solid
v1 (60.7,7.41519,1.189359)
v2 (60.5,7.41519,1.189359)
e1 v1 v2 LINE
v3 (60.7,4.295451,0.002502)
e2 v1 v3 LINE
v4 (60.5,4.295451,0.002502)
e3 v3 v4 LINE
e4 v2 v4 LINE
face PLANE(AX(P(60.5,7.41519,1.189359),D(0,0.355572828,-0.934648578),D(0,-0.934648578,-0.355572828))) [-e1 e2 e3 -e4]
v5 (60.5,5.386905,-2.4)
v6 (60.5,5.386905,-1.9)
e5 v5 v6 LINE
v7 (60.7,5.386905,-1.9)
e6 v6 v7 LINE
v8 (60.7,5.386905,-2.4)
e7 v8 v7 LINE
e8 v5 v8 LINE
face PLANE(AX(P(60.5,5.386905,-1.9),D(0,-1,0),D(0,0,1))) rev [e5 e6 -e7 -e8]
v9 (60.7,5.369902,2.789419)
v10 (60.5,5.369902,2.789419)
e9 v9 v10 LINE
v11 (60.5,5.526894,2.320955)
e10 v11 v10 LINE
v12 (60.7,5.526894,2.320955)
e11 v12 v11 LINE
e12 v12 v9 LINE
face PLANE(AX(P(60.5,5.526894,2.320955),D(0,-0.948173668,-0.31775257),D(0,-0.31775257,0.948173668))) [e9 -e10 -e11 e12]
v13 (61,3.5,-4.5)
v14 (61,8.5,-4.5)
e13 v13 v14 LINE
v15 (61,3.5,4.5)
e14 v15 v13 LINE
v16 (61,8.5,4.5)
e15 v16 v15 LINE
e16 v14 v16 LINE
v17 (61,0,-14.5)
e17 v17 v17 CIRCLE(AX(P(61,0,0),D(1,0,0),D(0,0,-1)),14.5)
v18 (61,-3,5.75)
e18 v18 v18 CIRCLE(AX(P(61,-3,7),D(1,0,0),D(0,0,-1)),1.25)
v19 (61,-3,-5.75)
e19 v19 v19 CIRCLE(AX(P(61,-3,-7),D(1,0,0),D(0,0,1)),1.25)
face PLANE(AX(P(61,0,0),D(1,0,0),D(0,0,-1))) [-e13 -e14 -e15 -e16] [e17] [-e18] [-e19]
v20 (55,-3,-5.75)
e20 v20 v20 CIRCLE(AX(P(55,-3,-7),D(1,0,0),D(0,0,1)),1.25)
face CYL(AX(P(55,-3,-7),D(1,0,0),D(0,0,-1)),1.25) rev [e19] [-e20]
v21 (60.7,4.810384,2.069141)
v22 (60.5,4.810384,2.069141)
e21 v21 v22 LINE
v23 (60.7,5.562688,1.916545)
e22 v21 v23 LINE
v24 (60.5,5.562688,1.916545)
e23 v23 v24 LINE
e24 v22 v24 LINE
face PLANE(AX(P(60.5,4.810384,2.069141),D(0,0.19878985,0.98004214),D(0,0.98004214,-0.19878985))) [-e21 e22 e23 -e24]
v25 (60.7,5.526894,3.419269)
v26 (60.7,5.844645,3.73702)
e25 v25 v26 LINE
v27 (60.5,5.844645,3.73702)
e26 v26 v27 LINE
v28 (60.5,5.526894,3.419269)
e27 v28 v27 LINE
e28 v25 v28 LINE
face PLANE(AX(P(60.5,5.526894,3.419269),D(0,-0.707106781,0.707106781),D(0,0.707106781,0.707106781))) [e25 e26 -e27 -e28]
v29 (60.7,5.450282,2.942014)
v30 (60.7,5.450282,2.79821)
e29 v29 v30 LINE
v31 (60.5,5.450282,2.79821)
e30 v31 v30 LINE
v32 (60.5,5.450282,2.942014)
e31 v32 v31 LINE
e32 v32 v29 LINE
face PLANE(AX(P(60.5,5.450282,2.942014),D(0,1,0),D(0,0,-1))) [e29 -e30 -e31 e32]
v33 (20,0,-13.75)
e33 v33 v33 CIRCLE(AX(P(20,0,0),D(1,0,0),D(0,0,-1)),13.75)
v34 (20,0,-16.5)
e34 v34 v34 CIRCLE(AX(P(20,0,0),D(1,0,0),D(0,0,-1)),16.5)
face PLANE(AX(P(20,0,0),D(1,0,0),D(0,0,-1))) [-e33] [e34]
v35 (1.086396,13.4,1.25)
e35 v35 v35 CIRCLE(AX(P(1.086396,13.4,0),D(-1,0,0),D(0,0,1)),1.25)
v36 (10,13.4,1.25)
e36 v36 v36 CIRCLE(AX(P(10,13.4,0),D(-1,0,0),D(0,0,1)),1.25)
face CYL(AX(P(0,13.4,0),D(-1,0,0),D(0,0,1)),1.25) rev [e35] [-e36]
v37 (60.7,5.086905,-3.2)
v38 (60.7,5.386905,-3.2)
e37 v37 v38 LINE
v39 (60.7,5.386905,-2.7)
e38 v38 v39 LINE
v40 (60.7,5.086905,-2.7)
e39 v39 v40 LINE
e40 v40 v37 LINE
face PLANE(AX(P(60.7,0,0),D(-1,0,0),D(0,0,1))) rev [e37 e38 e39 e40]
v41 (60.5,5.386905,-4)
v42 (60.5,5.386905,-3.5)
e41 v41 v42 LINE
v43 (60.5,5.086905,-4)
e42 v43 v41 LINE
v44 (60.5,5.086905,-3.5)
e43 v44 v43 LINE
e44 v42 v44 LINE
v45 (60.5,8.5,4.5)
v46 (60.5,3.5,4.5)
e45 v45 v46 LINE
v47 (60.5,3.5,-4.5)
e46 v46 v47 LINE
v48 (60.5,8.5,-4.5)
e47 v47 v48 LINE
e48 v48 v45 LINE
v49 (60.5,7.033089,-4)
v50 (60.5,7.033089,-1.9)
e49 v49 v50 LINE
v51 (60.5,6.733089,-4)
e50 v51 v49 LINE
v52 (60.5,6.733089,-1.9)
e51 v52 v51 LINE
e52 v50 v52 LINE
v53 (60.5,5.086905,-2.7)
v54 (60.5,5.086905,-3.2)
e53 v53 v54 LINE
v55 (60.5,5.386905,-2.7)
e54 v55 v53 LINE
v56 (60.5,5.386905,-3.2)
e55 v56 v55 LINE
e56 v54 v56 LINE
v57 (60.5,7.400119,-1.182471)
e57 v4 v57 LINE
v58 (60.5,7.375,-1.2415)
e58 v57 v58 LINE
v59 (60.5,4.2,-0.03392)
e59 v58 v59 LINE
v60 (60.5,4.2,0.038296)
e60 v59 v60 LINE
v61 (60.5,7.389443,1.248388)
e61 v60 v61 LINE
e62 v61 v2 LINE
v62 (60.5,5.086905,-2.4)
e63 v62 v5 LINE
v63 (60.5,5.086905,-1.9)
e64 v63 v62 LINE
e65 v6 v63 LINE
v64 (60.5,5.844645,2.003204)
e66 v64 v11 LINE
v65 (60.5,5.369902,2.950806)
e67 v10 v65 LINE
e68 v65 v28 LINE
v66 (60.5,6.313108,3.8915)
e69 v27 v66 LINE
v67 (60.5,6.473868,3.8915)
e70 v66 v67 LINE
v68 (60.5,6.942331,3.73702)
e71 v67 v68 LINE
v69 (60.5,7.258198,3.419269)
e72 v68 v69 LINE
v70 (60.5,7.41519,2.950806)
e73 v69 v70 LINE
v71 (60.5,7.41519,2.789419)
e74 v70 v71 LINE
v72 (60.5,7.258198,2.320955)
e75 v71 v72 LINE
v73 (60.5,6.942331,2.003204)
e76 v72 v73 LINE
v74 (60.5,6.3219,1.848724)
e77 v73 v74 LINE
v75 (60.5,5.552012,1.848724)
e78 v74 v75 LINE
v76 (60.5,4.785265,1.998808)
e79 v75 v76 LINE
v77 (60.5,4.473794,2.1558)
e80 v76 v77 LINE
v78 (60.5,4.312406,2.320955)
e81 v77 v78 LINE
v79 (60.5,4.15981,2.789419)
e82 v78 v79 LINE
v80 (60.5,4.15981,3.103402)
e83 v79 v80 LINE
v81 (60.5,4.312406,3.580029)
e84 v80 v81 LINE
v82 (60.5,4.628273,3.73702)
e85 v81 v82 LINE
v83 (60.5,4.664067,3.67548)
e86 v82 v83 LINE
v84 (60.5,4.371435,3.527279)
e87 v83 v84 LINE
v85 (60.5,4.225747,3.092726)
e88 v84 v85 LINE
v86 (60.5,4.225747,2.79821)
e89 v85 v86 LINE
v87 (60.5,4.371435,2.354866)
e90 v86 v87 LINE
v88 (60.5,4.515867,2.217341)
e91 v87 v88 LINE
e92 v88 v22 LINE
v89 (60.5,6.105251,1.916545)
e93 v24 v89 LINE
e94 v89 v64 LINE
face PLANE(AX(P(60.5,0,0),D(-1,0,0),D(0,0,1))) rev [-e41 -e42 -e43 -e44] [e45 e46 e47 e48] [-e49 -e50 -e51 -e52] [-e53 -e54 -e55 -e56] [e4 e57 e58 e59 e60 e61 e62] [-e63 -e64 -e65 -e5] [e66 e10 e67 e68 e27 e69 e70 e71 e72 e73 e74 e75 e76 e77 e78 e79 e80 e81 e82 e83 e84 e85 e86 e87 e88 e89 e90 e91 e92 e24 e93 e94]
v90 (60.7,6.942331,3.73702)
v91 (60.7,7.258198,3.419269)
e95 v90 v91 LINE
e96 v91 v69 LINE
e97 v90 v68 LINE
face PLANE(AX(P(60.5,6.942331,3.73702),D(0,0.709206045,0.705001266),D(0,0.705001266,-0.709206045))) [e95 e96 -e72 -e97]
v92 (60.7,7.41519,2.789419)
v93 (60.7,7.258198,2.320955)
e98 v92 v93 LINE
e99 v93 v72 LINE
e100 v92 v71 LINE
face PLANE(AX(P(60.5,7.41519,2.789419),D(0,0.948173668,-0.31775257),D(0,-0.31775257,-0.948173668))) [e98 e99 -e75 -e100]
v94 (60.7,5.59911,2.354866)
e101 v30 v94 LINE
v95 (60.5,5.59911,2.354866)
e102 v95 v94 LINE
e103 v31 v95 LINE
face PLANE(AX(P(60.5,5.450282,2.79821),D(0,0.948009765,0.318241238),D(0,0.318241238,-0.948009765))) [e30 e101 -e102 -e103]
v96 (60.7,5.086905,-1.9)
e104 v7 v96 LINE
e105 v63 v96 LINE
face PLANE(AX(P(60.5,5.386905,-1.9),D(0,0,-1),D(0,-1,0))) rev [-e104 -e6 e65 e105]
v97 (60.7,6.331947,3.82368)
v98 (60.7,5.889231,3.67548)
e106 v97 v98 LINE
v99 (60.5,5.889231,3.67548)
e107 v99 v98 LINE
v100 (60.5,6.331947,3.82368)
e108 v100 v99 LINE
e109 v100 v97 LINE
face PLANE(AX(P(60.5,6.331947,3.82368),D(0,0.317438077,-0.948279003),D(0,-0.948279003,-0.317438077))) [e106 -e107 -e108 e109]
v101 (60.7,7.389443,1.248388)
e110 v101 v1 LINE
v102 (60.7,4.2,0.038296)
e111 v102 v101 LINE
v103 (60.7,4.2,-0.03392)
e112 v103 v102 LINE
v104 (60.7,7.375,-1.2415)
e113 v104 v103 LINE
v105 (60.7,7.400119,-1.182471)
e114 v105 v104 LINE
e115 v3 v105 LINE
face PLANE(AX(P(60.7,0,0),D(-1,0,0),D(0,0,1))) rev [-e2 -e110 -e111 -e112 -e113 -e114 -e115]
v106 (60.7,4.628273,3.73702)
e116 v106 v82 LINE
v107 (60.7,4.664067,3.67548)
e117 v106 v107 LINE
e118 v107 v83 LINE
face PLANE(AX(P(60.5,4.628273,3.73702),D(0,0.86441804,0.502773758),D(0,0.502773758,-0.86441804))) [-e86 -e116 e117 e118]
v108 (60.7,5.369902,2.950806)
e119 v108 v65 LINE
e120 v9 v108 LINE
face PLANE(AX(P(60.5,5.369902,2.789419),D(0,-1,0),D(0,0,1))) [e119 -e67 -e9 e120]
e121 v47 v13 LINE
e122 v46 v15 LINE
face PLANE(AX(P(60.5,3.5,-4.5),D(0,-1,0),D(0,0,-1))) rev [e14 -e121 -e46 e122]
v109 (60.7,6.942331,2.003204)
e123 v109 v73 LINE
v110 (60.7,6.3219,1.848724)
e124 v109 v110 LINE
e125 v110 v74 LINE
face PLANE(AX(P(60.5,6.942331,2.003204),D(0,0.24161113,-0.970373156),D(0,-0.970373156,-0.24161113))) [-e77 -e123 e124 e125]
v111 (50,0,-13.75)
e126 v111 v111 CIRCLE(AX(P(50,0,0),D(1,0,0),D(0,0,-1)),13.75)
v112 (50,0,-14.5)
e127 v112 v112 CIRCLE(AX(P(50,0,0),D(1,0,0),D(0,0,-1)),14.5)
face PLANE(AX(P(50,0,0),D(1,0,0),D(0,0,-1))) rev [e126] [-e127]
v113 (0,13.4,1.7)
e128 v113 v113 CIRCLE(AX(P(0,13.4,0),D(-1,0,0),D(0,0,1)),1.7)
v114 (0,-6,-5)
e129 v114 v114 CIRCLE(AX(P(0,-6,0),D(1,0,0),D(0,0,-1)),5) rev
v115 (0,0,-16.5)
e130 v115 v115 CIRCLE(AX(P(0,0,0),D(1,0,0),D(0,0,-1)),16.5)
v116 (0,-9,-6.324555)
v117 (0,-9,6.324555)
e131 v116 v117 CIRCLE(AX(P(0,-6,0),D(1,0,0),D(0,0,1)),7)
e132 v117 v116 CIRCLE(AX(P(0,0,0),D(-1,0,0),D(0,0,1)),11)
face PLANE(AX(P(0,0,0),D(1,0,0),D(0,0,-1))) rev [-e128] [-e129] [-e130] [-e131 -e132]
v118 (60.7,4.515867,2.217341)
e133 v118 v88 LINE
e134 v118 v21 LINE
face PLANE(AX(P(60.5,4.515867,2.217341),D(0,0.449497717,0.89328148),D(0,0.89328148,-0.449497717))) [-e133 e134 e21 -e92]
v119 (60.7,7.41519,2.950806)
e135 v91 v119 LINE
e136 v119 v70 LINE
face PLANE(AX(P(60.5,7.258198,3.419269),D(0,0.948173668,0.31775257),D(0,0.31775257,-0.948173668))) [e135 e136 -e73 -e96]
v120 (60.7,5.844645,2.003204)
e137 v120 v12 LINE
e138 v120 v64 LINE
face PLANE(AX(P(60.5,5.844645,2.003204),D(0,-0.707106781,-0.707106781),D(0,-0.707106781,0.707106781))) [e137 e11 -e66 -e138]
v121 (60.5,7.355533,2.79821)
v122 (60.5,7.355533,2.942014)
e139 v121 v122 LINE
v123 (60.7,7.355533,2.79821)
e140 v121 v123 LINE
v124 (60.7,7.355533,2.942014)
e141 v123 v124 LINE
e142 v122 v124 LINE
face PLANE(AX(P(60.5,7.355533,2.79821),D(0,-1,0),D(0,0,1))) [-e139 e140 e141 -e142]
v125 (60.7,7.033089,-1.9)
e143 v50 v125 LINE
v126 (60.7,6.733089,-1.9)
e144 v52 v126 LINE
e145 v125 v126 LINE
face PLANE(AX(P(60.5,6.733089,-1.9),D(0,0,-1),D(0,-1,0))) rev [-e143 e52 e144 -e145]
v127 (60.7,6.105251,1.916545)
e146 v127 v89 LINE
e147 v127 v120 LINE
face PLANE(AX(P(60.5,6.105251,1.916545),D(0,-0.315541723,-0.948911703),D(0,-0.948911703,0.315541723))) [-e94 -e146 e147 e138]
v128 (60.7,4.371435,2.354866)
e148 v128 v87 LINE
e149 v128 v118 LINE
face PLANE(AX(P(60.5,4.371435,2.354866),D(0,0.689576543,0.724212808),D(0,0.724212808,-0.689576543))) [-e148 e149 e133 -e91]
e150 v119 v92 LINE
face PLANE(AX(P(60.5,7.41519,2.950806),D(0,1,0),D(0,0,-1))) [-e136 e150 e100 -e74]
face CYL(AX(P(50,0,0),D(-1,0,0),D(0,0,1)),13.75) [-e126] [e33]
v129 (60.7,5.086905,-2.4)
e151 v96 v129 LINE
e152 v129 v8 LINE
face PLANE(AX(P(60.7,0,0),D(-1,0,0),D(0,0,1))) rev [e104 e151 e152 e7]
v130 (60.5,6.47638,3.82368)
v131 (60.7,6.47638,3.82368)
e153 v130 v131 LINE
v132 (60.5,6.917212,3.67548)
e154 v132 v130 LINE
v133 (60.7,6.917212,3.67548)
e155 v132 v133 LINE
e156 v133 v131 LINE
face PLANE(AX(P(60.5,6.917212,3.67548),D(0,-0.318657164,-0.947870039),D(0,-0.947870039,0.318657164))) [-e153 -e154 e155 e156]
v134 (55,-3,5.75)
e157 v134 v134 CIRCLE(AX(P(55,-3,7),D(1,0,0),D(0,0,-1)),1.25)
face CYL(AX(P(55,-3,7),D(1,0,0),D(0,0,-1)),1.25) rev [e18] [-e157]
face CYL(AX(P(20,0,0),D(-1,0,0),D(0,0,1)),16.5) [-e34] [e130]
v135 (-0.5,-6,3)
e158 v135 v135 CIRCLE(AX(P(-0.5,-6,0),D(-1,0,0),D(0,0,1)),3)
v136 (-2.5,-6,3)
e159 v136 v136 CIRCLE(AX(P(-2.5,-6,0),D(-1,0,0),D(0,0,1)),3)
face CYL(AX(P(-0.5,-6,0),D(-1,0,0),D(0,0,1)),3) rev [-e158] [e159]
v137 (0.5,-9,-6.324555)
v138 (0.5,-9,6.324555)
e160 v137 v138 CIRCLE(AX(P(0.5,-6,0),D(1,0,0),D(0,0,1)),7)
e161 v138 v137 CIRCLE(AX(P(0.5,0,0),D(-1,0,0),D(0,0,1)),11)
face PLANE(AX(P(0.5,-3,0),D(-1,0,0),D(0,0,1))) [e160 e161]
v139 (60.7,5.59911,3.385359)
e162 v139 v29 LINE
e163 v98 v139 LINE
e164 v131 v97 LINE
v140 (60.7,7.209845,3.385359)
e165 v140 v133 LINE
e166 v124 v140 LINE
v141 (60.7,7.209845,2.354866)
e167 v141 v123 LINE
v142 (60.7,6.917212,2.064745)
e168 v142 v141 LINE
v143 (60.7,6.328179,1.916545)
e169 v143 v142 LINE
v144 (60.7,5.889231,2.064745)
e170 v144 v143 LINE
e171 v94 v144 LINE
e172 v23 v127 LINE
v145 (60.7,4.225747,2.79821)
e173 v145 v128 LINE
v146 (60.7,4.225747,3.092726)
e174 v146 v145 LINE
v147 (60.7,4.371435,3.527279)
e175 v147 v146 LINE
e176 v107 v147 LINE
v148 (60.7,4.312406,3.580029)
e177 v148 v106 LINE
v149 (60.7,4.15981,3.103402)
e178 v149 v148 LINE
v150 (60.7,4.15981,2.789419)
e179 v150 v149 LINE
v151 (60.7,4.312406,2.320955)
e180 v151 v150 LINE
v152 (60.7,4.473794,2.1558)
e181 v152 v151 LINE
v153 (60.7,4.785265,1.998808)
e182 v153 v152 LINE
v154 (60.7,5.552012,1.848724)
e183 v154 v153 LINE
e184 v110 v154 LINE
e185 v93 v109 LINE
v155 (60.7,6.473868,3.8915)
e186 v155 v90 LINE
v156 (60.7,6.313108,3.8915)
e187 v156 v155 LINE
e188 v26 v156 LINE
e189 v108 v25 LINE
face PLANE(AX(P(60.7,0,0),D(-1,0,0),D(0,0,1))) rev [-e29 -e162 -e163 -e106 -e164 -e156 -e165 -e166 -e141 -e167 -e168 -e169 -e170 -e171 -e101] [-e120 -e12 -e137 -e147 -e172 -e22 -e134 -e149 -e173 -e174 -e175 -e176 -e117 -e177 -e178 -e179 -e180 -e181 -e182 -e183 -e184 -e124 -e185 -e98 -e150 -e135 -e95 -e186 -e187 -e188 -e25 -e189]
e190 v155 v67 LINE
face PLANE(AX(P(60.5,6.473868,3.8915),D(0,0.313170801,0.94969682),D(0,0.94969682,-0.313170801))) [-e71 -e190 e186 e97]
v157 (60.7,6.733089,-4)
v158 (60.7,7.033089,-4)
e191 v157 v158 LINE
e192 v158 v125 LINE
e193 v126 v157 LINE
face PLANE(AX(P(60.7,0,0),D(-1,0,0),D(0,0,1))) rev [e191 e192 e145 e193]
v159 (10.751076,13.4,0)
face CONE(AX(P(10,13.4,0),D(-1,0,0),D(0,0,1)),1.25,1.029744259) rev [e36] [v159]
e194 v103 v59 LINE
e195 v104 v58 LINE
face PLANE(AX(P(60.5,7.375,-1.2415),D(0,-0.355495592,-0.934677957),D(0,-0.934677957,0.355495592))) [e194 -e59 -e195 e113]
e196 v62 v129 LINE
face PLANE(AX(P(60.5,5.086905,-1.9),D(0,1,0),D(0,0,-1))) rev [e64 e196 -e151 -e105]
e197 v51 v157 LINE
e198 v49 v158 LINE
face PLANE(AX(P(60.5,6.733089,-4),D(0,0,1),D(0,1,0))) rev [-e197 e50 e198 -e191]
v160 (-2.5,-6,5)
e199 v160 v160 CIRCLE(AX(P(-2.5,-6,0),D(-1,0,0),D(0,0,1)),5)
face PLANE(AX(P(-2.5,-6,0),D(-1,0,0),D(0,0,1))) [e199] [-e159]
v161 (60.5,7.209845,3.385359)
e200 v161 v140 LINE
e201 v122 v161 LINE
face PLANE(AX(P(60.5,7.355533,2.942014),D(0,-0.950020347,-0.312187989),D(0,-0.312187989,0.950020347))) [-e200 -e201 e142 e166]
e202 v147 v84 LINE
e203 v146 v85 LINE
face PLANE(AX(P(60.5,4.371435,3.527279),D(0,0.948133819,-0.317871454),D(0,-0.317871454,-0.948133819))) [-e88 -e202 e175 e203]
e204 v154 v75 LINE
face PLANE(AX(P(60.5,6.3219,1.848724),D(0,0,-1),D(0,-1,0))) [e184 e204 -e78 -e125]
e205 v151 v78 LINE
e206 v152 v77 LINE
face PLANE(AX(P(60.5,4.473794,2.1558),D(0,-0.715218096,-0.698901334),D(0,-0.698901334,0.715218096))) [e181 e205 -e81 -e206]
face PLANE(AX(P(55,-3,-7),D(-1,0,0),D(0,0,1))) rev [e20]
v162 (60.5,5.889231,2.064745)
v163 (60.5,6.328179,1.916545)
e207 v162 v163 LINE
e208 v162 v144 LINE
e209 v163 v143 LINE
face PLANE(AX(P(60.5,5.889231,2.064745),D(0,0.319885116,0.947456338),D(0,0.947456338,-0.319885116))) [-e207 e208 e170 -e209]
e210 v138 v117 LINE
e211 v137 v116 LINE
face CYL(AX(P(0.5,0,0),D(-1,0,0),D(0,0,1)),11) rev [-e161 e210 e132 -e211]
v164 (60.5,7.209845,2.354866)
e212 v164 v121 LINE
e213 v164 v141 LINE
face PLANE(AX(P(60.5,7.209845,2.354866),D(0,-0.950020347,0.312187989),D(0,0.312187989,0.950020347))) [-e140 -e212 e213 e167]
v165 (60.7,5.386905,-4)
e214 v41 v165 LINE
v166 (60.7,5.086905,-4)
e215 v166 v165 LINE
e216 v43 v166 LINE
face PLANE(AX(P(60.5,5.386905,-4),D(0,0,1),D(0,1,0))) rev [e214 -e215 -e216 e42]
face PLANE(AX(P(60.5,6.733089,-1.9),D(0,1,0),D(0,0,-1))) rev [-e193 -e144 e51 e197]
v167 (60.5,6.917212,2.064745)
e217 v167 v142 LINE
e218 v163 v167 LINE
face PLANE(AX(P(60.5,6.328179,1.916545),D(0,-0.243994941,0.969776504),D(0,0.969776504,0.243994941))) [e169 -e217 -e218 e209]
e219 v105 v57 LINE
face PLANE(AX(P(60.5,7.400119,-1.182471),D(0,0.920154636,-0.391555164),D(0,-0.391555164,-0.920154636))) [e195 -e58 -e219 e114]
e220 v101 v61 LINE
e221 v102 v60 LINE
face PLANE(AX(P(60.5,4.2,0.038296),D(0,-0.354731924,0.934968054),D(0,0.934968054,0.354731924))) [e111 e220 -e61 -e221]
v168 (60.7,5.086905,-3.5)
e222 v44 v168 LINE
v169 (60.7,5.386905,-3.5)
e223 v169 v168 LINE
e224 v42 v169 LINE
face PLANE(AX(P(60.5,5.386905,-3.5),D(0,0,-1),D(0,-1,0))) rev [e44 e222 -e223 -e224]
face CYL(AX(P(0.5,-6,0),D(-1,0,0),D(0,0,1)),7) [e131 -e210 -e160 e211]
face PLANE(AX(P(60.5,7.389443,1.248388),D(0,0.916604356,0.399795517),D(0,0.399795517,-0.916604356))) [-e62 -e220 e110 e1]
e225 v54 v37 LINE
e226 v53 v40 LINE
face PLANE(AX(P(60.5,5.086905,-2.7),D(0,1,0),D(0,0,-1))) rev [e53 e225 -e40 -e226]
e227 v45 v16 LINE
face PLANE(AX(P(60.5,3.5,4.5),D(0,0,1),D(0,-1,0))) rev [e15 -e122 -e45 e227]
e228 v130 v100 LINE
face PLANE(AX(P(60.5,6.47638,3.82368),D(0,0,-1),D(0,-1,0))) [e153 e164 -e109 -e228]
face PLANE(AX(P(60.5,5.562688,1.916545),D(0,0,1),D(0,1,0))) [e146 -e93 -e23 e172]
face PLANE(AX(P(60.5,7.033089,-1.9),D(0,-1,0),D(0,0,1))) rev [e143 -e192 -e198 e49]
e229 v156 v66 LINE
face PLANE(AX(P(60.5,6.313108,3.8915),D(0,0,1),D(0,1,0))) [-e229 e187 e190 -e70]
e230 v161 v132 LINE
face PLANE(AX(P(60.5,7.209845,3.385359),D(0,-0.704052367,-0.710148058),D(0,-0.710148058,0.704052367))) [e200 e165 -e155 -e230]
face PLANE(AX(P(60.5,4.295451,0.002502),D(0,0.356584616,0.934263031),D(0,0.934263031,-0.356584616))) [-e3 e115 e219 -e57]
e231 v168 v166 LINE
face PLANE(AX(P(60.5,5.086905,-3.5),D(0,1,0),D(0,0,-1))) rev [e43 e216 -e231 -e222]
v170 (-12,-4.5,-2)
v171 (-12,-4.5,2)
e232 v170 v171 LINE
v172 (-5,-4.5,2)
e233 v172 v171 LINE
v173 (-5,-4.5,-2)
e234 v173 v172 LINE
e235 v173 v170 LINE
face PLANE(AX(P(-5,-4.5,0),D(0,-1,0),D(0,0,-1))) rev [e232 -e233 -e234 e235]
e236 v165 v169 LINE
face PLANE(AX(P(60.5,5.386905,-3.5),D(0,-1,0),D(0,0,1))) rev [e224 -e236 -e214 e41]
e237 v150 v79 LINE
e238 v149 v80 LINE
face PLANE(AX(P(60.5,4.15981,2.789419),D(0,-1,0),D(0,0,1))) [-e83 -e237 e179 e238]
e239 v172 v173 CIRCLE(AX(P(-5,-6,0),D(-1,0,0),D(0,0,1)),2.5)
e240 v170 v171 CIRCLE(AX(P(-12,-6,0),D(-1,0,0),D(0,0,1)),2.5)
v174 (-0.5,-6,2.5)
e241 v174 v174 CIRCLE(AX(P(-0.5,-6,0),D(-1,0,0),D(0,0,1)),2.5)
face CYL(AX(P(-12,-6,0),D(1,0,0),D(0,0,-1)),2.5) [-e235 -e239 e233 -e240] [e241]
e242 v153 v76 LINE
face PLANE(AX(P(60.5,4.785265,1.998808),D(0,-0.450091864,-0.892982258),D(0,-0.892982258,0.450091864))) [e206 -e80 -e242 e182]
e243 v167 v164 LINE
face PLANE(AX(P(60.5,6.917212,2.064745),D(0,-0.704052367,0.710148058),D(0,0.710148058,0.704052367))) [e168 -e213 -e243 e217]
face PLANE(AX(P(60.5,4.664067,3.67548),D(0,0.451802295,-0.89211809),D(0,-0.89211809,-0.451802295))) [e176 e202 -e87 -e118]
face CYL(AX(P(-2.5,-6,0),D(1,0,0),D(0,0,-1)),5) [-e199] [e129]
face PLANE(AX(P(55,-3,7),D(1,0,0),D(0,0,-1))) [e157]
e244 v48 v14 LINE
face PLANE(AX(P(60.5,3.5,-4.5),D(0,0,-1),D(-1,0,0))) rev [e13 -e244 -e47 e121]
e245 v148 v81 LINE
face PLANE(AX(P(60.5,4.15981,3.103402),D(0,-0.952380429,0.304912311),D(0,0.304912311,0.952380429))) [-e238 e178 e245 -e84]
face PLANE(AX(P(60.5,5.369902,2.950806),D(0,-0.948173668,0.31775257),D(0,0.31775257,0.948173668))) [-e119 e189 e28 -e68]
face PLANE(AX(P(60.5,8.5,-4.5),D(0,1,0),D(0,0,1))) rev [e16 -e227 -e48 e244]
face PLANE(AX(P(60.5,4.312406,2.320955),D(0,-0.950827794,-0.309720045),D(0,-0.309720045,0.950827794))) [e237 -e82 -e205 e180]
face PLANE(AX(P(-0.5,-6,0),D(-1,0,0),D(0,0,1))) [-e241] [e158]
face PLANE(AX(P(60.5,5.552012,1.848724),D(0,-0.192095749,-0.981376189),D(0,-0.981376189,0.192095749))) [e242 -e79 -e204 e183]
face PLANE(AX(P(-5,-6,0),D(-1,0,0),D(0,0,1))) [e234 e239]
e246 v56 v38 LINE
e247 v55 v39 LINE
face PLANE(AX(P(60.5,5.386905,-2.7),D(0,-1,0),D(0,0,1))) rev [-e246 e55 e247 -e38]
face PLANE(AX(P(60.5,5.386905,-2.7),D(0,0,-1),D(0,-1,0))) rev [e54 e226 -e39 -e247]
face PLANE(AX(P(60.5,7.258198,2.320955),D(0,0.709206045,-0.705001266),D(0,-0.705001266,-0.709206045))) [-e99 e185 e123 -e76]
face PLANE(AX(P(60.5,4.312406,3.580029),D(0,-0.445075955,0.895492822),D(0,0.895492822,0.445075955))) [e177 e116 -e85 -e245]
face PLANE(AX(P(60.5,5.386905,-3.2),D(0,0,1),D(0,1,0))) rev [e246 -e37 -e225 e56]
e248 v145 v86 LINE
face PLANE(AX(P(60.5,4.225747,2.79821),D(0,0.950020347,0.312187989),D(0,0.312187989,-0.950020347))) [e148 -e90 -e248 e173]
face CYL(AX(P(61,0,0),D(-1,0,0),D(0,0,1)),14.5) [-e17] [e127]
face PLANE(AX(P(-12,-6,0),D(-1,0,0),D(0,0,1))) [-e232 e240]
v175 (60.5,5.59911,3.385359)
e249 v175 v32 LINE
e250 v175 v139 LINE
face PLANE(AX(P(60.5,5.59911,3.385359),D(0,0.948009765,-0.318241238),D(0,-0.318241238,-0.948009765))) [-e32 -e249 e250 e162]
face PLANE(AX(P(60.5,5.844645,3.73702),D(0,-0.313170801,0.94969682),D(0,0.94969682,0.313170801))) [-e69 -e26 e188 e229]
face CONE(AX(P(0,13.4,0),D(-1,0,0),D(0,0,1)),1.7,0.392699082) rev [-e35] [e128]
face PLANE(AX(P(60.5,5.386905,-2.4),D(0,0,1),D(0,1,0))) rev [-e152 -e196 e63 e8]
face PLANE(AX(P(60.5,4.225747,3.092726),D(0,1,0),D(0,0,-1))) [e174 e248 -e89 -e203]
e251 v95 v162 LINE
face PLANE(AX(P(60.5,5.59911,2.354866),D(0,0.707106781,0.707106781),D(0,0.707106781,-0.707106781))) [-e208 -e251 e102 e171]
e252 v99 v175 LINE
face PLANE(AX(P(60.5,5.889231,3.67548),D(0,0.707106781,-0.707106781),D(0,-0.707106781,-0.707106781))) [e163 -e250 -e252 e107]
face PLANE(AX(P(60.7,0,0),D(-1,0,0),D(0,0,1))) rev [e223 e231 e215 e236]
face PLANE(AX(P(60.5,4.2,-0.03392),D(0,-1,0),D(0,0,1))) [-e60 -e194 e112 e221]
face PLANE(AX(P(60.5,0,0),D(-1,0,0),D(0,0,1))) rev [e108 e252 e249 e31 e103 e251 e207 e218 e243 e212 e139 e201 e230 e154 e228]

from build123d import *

# Parameters (mm, degrees)
SKETCH_1_R                   = 16.5
EXTRUDE_1_DEPTH              = 20
SKETCH_2_R                   = 13.75
EXTRUDE_2_DEPTH              = 30
SKETCH_3_R                   = 14.5
EXTRUDE_3_DEPTH              = 11
SKETCH_4_W                   = 9
SKETCH_4_H                   = 5
CUT_EXTRUDE_1_DEPTH          = 0.5
WRAP_1_OUTLINE_W             = 2.1
WRAP_1_OUTLINE_H             = 0.3
WRAP_1_OUTLINE_W_2           = 0.5
WRAP_1_DEPTH                 = 0.2
SKETCH_6_R                   = 1.25
CUT_EXTRUDE_2_DEPTH          = 6
CUT_EXTRUDE_3_DEPTH          = 0.5
SKETCH_8_R                   = 5
EXTRUDE_4_DEPTH              = 2.5
SKETCH_9_R                   = 3
CUT_EXTRUDE_4_DEPTH          = 2
SKETCH_10_R                  = 2.5
EXTRUDE_5_DEPTH              = 11.5
CUT_EXTRUDE_START            = -7
CUT_EXTRUDE_5_DEPTH          = 7
HOLE_WIZARD_M3_1_D           = 2.5
HOLE_WIZARD_M3_1_DEPTH       = 10
HOLE_WIZARD_M3_1_CSINK_D     = 3.4
HOLE_WIZARD_M3_1_CSINK_ANGLE = 45
HOLE_WIZARD_M3_1_TIP         = 0.751075774


# Read off the part's stored shape, not the designer's step: 包覆1
with BuildPart() as part:
    # 草图1 → 凸台-拉伸1 (new body)
    with BuildSketch(Plane(origin=(0, 0, 0), x_dir=(0, 0, -1), z_dir=(1, 0, 0))):
        Circle(SKETCH_1_R)
    extrude(amount=EXTRUDE_1_DEPTH)

    # 草图2 → 凸台-拉伸2 (add)
    with BuildSketch(Plane(origin=(20, 0, 0), x_dir=(0, 0, -1), z_dir=(1, 0, 0))):
        Circle(SKETCH_2_R)
    extrude(amount=EXTRUDE_2_DEPTH)

    # 草图3 → 凸台-拉伸3 (add)
    with BuildSketch(Plane(origin=(50, 0, 0), x_dir=(0, 0, -1), z_dir=(1, 0, 0))):
        Circle(SKETCH_3_R)
    extrude(amount=EXTRUDE_3_DEPTH)

    # 草图4 → 切除-拉伸1 (cut)
    with BuildSketch(Plane(origin=(61, 0, 0), x_dir=(0, 0, -1), z_dir=(1, 0, 0))):
        with Locations((0, 6)):
            Rectangle(SKETCH_4_W, SKETCH_4_H)
    extrude(amount=-CUT_EXTRUDE_1_DEPTH, mode=Mode.SUBTRACT)

    # 包覆1 outline → 包覆1 (add)
    # profile 1 of 6: a face of its own
    with BuildSketch(Plane(origin=(60.5, 0, 0), x_dir=(0, 0, -1), z_dir=(1, 0, 0))):
        Polygon((-2.789418513, 5.369902097), (-2.320955301, 5.52689379), (-2.003204114, 5.844644976), (-1.916544699, 6.105251187), (-1.916544699, 5.562687896), (-2.069140625, 4.810383703), (-2.217340783, 4.515867286), (-2.354865506, 4.371434929), (-2.798210047, 4.225746638), (-3.092726464, 4.225746638), (-3.52727947, 4.371434929), (-3.675479628, 4.664067445), (-3.737020372, 4.628273339), (-3.580028679, 4.312406052), (-3.103401899, 4.159810127), (-2.789418513, 4.159810127), (-2.320955301, 4.312406052), (-2.15580004, 4.473793513), (-1.998808347, 4.785265032), (-1.848724288, 5.55201246), (-1.848724288, 6.321899723), (-2.003204114, 6.942330894), (-2.320955301, 7.25819818), (-2.789418513, 7.415189873), (-2.950805973, 7.415189873), (-3.419269185, 7.25819818), (-3.737020372, 6.942330894), (-3.891500198, 6.473867682), (-3.891500198, 6.313108188), (-3.737020372, 5.844644976), (-3.419269185, 5.52689379), (-2.950805973, 5.369902097), align=None)
        Polygon((-2.798210047, 7.35553303), (-2.354865506, 7.209844739), (-2.064744858, 6.917212223), (-1.916544699, 6.328179391), (-2.064744858, 5.889230617), (-2.354865506, 5.599109968), (-2.798210047, 5.450281843), (-2.942014438, 5.450281843), (-3.385358979, 5.599109968), (-3.675479628, 5.889230617), (-3.823679786, 6.331947191), (-3.823679786, 6.476379549), (-3.675479628, 6.917212223), (-3.385358979, 7.209844739), (-2.942014438, 7.35553303), align=None, mode=Mode.SUBTRACT)
    # profile 2 of 6: a face of its own
    with BuildSketch(Plane(origin=(60.5, 0, 0), x_dir=(0, 0, -1), z_dir=(1, 0, 0))):
        Polygon((-1.248388054, 7.389443236), (-0.038296084, 4.2), (0.033920095, 4.2), (1.241500198, 7.375), (1.182471321, 7.400118671), (-0.002501978, 4.295450949), (-1.189359177, 7.415189873), align=None)
    # profile 3 of 6: a face of its own
    with BuildSketch(Plane(origin=(60.5, 0, 0), x_dir=(0, 0, -1), z_dir=(1, 0, 0))):
        with Locations((2.95, 6.883089037)):
            Rectangle(WRAP_1_OUTLINE_W, WRAP_1_OUTLINE_H)
    # profile 4 of 6: a face of its own
    with BuildSketch(Plane(origin=(60.5, 0, 0), x_dir=(0, 0, -1), z_dir=(1, 0, 0))):
        with Locations((3.75, 5.236905413)):
            Rectangle(WRAP_1_OUTLINE_W_2, WRAP_1_OUTLINE_H)
    # profile 5 of 6: a face of its own
    with BuildSketch(Plane(origin=(60.5, 0, 0), x_dir=(0, 0, -1), z_dir=(1, 0, 0))):
        with Locations((2.15, 5.236905413)):
            Rectangle(WRAP_1_OUTLINE_W_2, WRAP_1_OUTLINE_H)
    # profile 6 of 6: a face of its own
    with BuildSketch(Plane(origin=(60.5, 0, 0), x_dir=(0, 0, -1), z_dir=(1, 0, 0))):
        with Locations((2.95, 5.236905413)):
            Rectangle(WRAP_1_OUTLINE_W_2, WRAP_1_OUTLINE_H)
    extrude(amount=WRAP_1_DEPTH)

    # 草图6 → 切除-拉伸2 (cut)
    with BuildSketch(Plane(origin=(61, 0, 0), x_dir=(0, 0, -1), z_dir=(1, 0, 0))):
        with Locations((-7, -3)):
            Circle(SKETCH_6_R)
        with Locations(Location((7, -3, 0), (0, 0, 180))):
            Circle(SKETCH_6_R)
    extrude(amount=-CUT_EXTRUDE_2_DEPTH, mode=Mode.SUBTRACT)

    # 草图7 → 切除-拉伸3 (cut)
    with BuildSketch(Plane.ZY):
        with BuildLine():
            ThreePointArc((6.32455532, -9), (0, 11), (-6.32455532, -9))
            ThreePointArc((-6.32455532, -9), (0, 1), (6.32455532, -9))
        make_face()
    extrude(amount=-CUT_EXTRUDE_3_DEPTH, mode=Mode.SUBTRACT)

    # 草图8 → 凸台-拉伸4 (add)
    with BuildSketch(Plane.ZY):
        with Locations(Location((0, -6, 0), (0, 0, 180))):
            Circle(SKETCH_8_R)
    extrude(amount=EXTRUDE_4_DEPTH)

    # 草图9 → 切除-拉伸4 (cut)
    with BuildSketch(Plane.ZY.offset(2.5)):
        with Locations((0, -6)):
            Circle(SKETCH_9_R)
    extrude(amount=-CUT_EXTRUDE_4_DEPTH, mode=Mode.SUBTRACT)

    # 草图10 → 凸台-拉伸5 (add)
    with BuildSketch(Plane.ZY.offset(0.5)):
        with Locations((0, -6)):
            Circle(SKETCH_10_R)
    extrude(amount=EXTRUDE_5_DEPTH)

    # 草图11 → 切除-拉伸5 (cut)
    with BuildSketch(Plane.ZY.offset(12).offset(CUT_EXTRUDE_START)):
        with BuildLine():
            Line((0, -4.5), (-2, -4.5))
            ThreePointArc((-2, -4.5), (0, -3.5), (2, -4.5))
            Line((2, -4.5), (0, -4.5))
        make_face()
    extrude(amount=CUT_EXTRUDE_5_DEPTH, mode=Mode.SUBTRACT)

    # M3 螺纹孔1
    with Locations(Plane(origin=(0, 13.4, 0), x_dir=(0, 0, -1), z_dir=(-1, 0, 0))):
        with Locations((0, 0)):
            CounterSinkHole(HOLE_WIZARD_M3_1_D / 2, HOLE_WIZARD_M3_1_CSINK_D / 2, depth=HOLE_WIZARD_M3_1_DEPTH, counter_sink_angle=HOLE_WIZARD_M3_1_CSINK_ANGLE)
            with Locations((0, 0, -(HOLE_WIZARD_M3_1_DEPTH + HOLE_WIZARD_M3_1_TIP / 2))):  # 118° drill point
                Cone(0, HOLE_WIZARD_M3_1_D / 2, HOLE_WIZARD_M3_1_TIP, mode=Mode.SUBTRACT)


solid = part.part
